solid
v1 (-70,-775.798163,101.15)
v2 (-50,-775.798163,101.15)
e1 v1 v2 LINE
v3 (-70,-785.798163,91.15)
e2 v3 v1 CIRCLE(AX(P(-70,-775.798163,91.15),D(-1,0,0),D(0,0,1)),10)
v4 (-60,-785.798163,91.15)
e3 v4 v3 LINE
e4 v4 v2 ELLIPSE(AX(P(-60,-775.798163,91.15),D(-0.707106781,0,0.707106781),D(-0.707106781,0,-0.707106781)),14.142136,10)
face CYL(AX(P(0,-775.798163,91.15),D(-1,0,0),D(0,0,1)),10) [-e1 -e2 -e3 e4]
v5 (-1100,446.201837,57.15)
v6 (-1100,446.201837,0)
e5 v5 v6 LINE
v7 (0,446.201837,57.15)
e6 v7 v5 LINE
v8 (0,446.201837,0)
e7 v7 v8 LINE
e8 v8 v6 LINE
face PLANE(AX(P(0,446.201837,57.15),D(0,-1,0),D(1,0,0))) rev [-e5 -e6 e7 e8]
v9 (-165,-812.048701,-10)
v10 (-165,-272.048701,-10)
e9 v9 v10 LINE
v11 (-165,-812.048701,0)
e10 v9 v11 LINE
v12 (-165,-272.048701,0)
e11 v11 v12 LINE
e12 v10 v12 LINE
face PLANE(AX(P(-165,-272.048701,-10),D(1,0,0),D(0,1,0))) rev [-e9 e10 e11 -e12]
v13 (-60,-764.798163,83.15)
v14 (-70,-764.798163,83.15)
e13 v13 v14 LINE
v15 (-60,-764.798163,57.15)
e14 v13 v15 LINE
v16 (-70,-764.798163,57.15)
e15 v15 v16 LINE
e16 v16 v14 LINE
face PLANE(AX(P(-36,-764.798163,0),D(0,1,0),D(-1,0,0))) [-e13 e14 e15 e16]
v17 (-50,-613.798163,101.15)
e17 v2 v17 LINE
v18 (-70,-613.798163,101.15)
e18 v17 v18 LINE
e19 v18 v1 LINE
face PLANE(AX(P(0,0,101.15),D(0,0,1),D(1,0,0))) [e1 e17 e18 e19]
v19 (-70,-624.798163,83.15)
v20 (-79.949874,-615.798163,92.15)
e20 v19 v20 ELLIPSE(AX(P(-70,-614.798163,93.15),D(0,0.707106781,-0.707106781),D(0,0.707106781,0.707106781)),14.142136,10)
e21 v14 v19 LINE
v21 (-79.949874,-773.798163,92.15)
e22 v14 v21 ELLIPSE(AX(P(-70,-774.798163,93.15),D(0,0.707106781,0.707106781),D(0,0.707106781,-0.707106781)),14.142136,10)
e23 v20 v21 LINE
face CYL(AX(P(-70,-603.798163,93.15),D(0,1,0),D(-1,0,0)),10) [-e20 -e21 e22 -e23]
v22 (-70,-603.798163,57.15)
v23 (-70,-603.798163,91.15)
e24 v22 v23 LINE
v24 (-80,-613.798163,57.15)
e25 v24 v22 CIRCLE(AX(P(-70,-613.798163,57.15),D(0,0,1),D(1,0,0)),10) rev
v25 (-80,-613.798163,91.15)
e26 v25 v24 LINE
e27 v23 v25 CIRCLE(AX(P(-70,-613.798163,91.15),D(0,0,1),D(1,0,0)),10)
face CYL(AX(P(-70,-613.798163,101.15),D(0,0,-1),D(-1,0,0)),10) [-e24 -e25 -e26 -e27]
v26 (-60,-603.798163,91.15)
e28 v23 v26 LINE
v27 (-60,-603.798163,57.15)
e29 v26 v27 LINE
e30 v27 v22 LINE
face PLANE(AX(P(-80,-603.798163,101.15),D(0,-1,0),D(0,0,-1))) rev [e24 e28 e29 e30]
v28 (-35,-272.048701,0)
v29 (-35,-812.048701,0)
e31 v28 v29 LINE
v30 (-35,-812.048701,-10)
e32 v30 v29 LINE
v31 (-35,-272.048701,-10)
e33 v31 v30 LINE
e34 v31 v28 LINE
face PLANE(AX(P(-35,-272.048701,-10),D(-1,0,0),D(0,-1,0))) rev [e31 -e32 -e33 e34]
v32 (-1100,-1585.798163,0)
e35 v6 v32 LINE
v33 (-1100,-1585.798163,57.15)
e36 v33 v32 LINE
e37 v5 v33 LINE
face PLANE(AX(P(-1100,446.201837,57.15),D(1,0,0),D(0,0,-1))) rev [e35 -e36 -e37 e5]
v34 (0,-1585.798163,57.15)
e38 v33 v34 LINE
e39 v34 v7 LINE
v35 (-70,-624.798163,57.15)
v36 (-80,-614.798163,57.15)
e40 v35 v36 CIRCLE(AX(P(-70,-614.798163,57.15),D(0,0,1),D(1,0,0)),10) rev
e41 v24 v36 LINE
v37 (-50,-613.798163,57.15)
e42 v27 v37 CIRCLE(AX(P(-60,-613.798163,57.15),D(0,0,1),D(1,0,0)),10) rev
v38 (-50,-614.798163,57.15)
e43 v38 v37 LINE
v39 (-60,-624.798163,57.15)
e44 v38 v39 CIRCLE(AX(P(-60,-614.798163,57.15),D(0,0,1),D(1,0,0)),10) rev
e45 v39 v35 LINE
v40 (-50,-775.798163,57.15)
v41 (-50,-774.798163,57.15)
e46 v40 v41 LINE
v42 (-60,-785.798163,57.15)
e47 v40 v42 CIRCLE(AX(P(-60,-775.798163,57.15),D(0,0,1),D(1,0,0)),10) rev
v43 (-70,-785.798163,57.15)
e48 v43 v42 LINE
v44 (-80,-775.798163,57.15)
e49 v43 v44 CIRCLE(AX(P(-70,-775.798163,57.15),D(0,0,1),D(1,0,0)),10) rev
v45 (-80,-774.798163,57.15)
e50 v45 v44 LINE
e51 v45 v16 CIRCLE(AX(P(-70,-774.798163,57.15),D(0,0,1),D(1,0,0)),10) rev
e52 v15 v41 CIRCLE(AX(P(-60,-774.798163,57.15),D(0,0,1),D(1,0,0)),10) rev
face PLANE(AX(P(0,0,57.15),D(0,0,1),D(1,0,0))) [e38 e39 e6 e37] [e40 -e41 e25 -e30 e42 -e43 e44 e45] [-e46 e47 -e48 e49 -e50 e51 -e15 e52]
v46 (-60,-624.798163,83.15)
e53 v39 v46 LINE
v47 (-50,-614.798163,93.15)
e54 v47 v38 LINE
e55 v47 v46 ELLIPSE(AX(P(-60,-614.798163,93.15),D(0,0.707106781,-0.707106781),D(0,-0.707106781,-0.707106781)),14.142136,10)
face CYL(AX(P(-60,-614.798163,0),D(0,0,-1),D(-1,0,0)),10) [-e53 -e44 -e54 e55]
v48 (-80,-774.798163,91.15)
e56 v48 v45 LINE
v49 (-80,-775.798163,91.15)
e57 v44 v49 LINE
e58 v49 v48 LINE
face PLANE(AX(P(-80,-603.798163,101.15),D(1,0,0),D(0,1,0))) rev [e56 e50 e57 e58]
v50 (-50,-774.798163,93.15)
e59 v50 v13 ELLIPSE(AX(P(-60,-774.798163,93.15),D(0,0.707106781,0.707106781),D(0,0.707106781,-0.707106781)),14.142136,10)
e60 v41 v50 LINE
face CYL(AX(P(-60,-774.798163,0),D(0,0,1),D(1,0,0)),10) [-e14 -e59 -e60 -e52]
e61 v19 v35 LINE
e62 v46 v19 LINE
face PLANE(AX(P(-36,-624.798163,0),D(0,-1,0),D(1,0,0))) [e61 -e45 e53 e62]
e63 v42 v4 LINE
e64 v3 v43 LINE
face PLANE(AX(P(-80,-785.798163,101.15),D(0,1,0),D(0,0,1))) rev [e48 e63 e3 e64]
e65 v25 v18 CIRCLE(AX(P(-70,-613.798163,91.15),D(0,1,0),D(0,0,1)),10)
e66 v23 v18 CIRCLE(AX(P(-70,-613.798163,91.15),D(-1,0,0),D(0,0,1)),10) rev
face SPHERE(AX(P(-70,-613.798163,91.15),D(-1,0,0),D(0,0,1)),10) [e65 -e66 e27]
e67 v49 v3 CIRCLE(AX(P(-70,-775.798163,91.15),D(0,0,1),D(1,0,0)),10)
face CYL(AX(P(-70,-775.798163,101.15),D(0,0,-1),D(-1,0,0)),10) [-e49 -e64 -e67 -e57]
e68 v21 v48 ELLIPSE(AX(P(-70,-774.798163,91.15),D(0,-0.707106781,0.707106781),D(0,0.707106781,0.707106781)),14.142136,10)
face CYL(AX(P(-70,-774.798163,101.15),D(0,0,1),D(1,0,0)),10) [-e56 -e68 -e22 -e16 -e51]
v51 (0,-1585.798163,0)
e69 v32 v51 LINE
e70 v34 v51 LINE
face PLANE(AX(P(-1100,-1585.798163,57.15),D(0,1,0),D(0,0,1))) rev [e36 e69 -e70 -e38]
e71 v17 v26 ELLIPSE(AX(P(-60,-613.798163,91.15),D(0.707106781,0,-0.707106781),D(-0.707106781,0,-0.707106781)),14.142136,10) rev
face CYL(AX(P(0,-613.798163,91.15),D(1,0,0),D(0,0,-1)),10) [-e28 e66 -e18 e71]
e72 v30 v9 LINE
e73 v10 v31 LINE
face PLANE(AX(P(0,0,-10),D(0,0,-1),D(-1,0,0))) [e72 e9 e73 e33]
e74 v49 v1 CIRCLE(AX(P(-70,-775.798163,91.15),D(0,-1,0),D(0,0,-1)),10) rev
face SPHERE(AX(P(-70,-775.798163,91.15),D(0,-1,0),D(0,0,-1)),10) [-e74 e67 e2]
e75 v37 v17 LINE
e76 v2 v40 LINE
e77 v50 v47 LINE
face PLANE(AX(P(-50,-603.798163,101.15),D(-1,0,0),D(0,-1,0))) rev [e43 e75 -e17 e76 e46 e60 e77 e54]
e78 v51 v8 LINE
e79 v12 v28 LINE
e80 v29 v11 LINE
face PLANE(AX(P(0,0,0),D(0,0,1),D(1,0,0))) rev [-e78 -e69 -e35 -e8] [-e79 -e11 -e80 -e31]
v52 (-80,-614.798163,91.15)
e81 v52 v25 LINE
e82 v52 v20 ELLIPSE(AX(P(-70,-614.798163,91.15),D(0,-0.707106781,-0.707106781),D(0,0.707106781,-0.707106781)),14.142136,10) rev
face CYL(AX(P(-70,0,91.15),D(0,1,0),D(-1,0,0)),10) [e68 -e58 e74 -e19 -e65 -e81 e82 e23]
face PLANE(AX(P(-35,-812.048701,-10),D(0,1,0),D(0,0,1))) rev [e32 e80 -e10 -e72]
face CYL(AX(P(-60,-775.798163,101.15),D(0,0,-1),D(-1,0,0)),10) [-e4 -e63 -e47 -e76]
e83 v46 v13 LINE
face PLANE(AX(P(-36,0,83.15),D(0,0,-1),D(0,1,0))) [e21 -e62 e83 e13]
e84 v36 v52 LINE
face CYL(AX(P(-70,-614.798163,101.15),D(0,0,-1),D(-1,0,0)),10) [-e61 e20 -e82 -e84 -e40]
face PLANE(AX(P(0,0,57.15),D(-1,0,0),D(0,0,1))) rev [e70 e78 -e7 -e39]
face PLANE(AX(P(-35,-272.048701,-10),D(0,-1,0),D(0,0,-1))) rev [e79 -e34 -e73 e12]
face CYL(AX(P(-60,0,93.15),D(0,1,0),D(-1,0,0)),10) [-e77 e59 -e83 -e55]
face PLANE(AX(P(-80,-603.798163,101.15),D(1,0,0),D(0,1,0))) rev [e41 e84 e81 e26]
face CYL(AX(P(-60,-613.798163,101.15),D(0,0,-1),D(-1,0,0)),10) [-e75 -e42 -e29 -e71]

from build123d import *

# Parameters (mm, degrees)
BOSS_EXTRUDE2_DEPTH = 57.15
BOSS_EXTRUDE3_DEPTH = 44
CUT_EXTRUDE1_DEPTH  = 44
FILLET1_R           = 10
BOSS_EXTRUDE4_DEPTH = 10


with BuildPart() as part:
    # Sketch1 → Boss-Extrude2 (new body)
    with BuildSketch(Plane.XY):
        Polygon((0, 0), (0, 446.2018372120283), (-1100, 446.2018372120282), (-1100, -1585.7981627879717), (0, -1585.7981627879717), align=None)
    extrude(amount=BOSS_EXTRUDE2_DEPTH)

    # Sketch4 → Boss-Extrude3 (add)
    with BuildSketch(Plane.XY.offset(57.15)):
        Polygon((-79.99999999999993, -603.7981627879718), (-49.999999999999936, -603.7981627879718), (-49.999999999999915, -785.7981627879718), (-79.9999999999999, -785.7981627879718), align=None)
    extrude(amount=BOSS_EXTRUDE3_DEPTH)

    # Sketch5 → Cut-Extrude1 (cut)
    with BuildSketch(Plane.ZY.offset(80.00000000000003)):
        Polygon((83.14999999999999, -624.7981627879717), (57.150000000000006, -624.7981627879717), (57.15, -764.7981627879717), (83.15, -764.7981627879717), align=None)
    extrude(amount=-CUT_EXTRUDE1_DEPTH, mode=Mode.SUBTRACT)

    # Fillet1
    # the kernel refuses this fillet: 10 mm, written as the material it takes off along each edge
    with BuildSketch(Plane(origin=(-69.99999999999993, -613.7981627879718, 91.15), x_dir=(-1, -1.6e-16, 0), z_dir=(0, 1, 0))) as fillet1_piece_1_section:
        Polygon((0, 0), (FILLET1_R, 0), (FILLET1_R, FILLET1_R), (0, FILLET1_R), align=None)
    fillet1_piece_1 = extrude(amount=FILLET1_R, mode=Mode.PRIVATE)
    fillet1_piece_1 = fillet1_piece_1 - Plane(origin=(-69.99999999999993, -613.7981627879718, 91.15), x_dir=(0.7071067811865475, 0, -0.7071067811865475), z_dir=(0, 1, 0)) * Sphere(FILLET1_R, mode=Mode.PRIVATE)
    add(fillet1_piece_1, mode=Mode.SUBTRACT)
    with BuildSketch(Plane(origin=(-69.9999999999999, -775.7981627879718, 91.15), x_dir=(0, 0, 1), z_dir=(-1, -1.6e-16, 0))) as fillet1_piece_2_section:
        Polygon((0, 0), (FILLET1_R, 0), (FILLET1_R, -FILLET1_R), (0, -FILLET1_R), align=None)
    fillet1_piece_2 = extrude(amount=FILLET1_R, mode=Mode.PRIVATE)
    fillet1_piece_2 = fillet1_piece_2 - Plane(origin=(-69.9999999999999, -775.7981627879718, 91.15), x_dir=(0, 0.7071067811865475, -0.7071067811865475), z_dir=(-1, -1.6e-16, 0)) * Sphere(FILLET1_R, mode=Mode.PRIVATE)
    add(fillet1_piece_2, mode=Mode.SUBTRACT)
    with BuildSketch(Plane(origin=(-49.999999999999915, -785.7981627879718, 57.15), x_dir=(-1, 0, 0), z_dir=(0, 0, 1))) as fillet1_piece_3:
        with BuildLine():
            CenterArc((FILLET1_R, -FILLET1_R), FILLET1_R, 90, 90)
            Line((0, -FILLET1_R), (0, 0))
            Line((0, 0), (FILLET1_R, 0))
        make_face()
    extrude(amount=69, mode=Mode.SUBTRACT)
    with BuildSketch(Plane(origin=(-49.999999999999936, -603.7981627879718, 57.15), x_dir=(0, -1, 0), z_dir=(0, 0, 1))) as fillet1_piece_4:
        with BuildLine():
            CenterArc((FILLET1_R, -FILLET1_R), FILLET1_R, 90, 90)
            Line((0, -FILLET1_R), (0, 0))
            Line((0, 0), (FILLET1_R, 0))
        make_face()
    extrude(amount=69, mode=Mode.SUBTRACT)
    with BuildSketch(Plane(origin=(-79.99999999999993, -603.7981627879718, 57.15), x_dir=(1, 0, 0), z_dir=(0, 0, 1))) as fillet1_piece_5:
        with BuildLine():
            CenterArc((FILLET1_R, -FILLET1_R), FILLET1_R, 90, 90)
            Line((0, -FILLET1_R), (0, 0))
            Line((0, 0), (FILLET1_R, 0))
        make_face()
    extrude(amount=34.00000000000001, mode=Mode.SUBTRACT)
    with BuildSketch(Plane(origin=(-79.9999999999999, -785.7981627879718, 57.15), x_dir=(1, 0, 0), z_dir=(0, 0, 1))) as fillet1_piece_6:
        with BuildLine():
            CenterArc((FILLET1_R, FILLET1_R), FILLET1_R, 180, 90)
            Line((0, FILLET1_R), (0, 0))
            Line((0, 0), (FILLET1_R, 0))
        make_face()
    extrude(amount=34.00000000000001, mode=Mode.SUBTRACT)
    with BuildSketch(Plane(origin=(-69.99999999999993, -603.7981627879718, 101.15), x_dir=(0, 0, -1), z_dir=(1, 0, 0))) as fillet1_piece_7:
        with BuildLine():
            CenterArc((FILLET1_R, -FILLET1_R), FILLET1_R, 90, 90)
            Line((0, -FILLET1_R), (0, 0))
            Line((0, 0), (FILLET1_R, 0))
        make_face()
    extrude(amount=44.99999999999999, mode=Mode.SUBTRACT)
    with BuildSketch(Plane(origin=(-79.9999999999999, -775.7981627879718, 101.15), x_dir=(0, 0, -1), z_dir=(-1.6e-16, 1, 0))) as fillet1_piece_8:
        with BuildLine():
            CenterArc((FILLET1_R, -FILLET1_R), FILLET1_R, 90, 90)
            Line((0, -FILLET1_R), (0, 0))
            Line((0, 0), (FILLET1_R, 0))
        make_face()
    extrude(amount=162, mode=Mode.SUBTRACT)
    with BuildSketch(Plane(origin=(-24.999999999999915, -785.7981627879718, 101.15), x_dir=(0, 0, -1), z_dir=(-1, 0, 0))) as fillet1_piece_9:
        with BuildLine():
            CenterArc((FILLET1_R, -FILLET1_R), FILLET1_R, 90, 90)
            Line((0, -FILLET1_R), (0, 0))
            Line((0, 0), (FILLET1_R, 0))
        make_face()
    extrude(amount=44.999999999999986, mode=Mode.SUBTRACT)
    with BuildSketch(Plane(origin=(-79.99999999999991, -764.7981627879717, 57.15000000000002), x_dir=(1.42e-15, -1, 0), z_dir=(0, 0, 1))) as fillet1_piece_10:
        with BuildLine():
            CenterArc((FILLET1_R, FILLET1_R), FILLET1_R, 180, 89.99999999999989)
            Line((1.421e-14, FILLET1_R), (0, 0))
            Line((0, 0), (FILLET1_R, 0))
        make_face()
    extrude(amount=25.999999999999986, mode=Mode.SUBTRACT)
    with BuildSketch(Plane(origin=(-79.99999999999993, -624.7981627879717, 83.14999999999999), x_dir=(0, 1, 0), z_dir=(0, 0, -1))) as fillet1_piece_11:
        with BuildLine():
            CenterArc((FILLET1_R, FILLET1_R), FILLET1_R, 180, 90)
            Line((0, FILLET1_R), (0, 0))
            Line((0, 0), (FILLET1_R, 0))
        make_face()
    extrude(amount=25.999999999999986, mode=Mode.SUBTRACT)
    with BuildSketch(Plane(origin=(-79.99999999999991, -764.7981627879717, 83.15), x_dir=(1.42e-15, 1e-16, 1), z_dir=(-1.5e-16, 1, -1e-16))) as fillet1_piece_12:
        with BuildLine():
            CenterArc((FILLET1_R, FILLET1_R), FILLET1_R, 180, 89.99999999999989)
            Line((1.421e-14, FILLET1_R), (0, 0))
            Line((0, 0), (FILLET1_R, 0))
        make_face()
    extrude(amount=140, mode=Mode.SUBTRACT)
    with BuildSketch(Plane(origin=(-49.999999999999915, -764.7981627879717, 83.15), x_dir=(0, -1, 0), z_dir=(0, 0, -1))) as fillet1_piece_13:
        with BuildLine():
            CenterArc((FILLET1_R, FILLET1_R), FILLET1_R, 180, 90)
            Line((0, FILLET1_R), (0, 0))
            Line((0, 0), (FILLET1_R, 0))
        make_face()
    extrude(amount=26, mode=Mode.SUBTRACT)
    with BuildSketch(Plane(origin=(-49.999999999999936, -624.7981627879717, 57.150000000000006), x_dir=(0, 1, 0), z_dir=(0, 0, 1))) as fillet1_piece_14:
        with BuildLine():
            CenterArc((FILLET1_R, FILLET1_R), FILLET1_R, 180.00000000000003, 90)
            Line((0, FILLET1_R), (0, 0))
            Line((0, 0), (FILLET1_R, 0))
        make_face()
    extrude(amount=25.999999999999986, mode=Mode.SUBTRACT)
    with BuildSketch(Plane(origin=(-49.999999999999936, -624.7981627879717, 83.15), x_dir=(0, 1e-16, 1), z_dir=(1.2e-16, -1, 1e-16))) as fillet1_piece_15:
        with BuildLine():
            CenterArc((FILLET1_R, FILLET1_R), FILLET1_R, 180, 90)
            Line((0, FILLET1_R), (0, 0))
            Line((0, 0), (FILLET1_R, 0))
        make_face()
    extrude(amount=140, mode=Mode.SUBTRACT)
    with BuildSketch(Plane(origin=(-79.99999999999991, -764.7981627879717, 57.15000000000002), x_dir=(1.42e-15, -1, 0), z_dir=(0, 0, 1))) as fillet1_piece_16a_section:
        with BuildLine():
            CenterArc((FILLET1_R, FILLET1_R), FILLET1_R, 180, 89.99999999999989)
            Line((1.421e-14, FILLET1_R), (0, 0))
            Line((0, 0), (FILLET1_R, 0))
        make_face()
    fillet1_piece_16a = extrude(amount=50.999999999999986, mode=Mode.PRIVATE)
    fillet1_piece_16a = split(fillet1_piece_16a, bisect_by=Plane(origin=(-77.7360488573316, -767.0621139306398, 83.15), z_dir=(0, 1e-16, 1)), keep=Keep.TOP, mode=Mode.PRIVATE)
    with BuildSketch(Plane(origin=(-79.9999999999999, -789.7981627879717, 83.15), x_dir=(0, 1e-16, 1), z_dir=(-1.5e-16, 1, -1e-16))) as fillet1_piece_16b_section:
        with BuildLine():
            CenterArc((FILLET1_R, FILLET1_R), FILLET1_R, 180, 90)
            Line((0, FILLET1_R), (0, 0))
            Line((0, 0), (FILLET1_R, 0))
        make_face()
    fillet1_piece_16b = extrude(amount=165, mode=Mode.PRIVATE)
    fillet1_piece_16b = split(fillet1_piece_16b, bisect_by=Plane(origin=(-77.73604885733165, -764.7981627879717, 85.41395114266827), z_dir=(1.5e-16, -1, 0)), keep=Keep.TOP, mode=Mode.PRIVATE)
    fillet1_piece_16 = fillet1_piece_16a & fillet1_piece_16b
    add(fillet1_piece_16, mode=Mode.SUBTRACT)
    with BuildSketch(Plane(origin=(-79.99999999999991, -764.7981627879717, 83.15), x_dir=(1.42e-15, 1e-16, 1), z_dir=(-1.5e-16, 1, -1e-16))) as fillet1_piece_17a_section:
        with BuildLine():
            CenterArc((FILLET1_R, FILLET1_R), FILLET1_R, 180, 89.99999999999989)
            Line((1.421e-14, FILLET1_R), (0, 0))
            Line((0, 0), (FILLET1_R, 0))
        make_face()
    fillet1_piece_17a = extrude(amount=165, mode=Mode.PRIVATE)
    fillet1_piece_17a = split(fillet1_piece_17a, bisect_by=Plane(origin=(-77.73604885733167, -624.7981627879717, 85.41395114266825), z_dir=(-1.5e-16, 1, 0)), keep=Keep.TOP, mode=Mode.PRIVATE)
    with BuildSketch(Plane(origin=(-79.99999999999993, -624.7981627879717, 108.14999999999998), x_dir=(0, 1, 0), z_dir=(0, 0, -1))) as fillet1_piece_17b_section:
        with BuildLine():
            CenterArc((FILLET1_R, FILLET1_R), FILLET1_R, 180, 90)
            Line((0, FILLET1_R), (0, 0))
            Line((0, 0), (FILLET1_R, 0))
        make_face()
    fillet1_piece_17b = extrude(amount=50.999999999999986, mode=Mode.PRIVATE)
    fillet1_piece_17b = split(fillet1_piece_17b, bisect_by=Plane(origin=(-77.73604885733164, -622.5342116453035, 83.14999999999999), z_dir=(0, 1e-16, 1)), keep=Keep.TOP, mode=Mode.PRIVATE)
    fillet1_piece_17 = fillet1_piece_17a & fillet1_piece_17b
    add(fillet1_piece_17, mode=Mode.SUBTRACT)
    with BuildSketch(Plane(origin=(-49.999999999999936, -624.7981627879717, 83.15), x_dir=(0, 1e-16, 1), z_dir=(1.2e-16, -1, 1e-16))) as fillet1_piece_18a_section:
        with BuildLine():
            CenterArc((FILLET1_R, FILLET1_R), FILLET1_R, 180, 90)
            Line((0, FILLET1_R), (0, 0))
            Line((0, 0), (FILLET1_R, 0))
        make_face()
    fillet1_piece_18a = extrude(amount=165, mode=Mode.PRIVATE)
    fillet1_piece_18a = split(fillet1_piece_18a, bisect_by=Plane(origin=(-52.26395114266817, -764.7981627879717, 85.41395114266827), z_dir=(1.5e-16, -1, 0)), keep=Keep.TOP, mode=Mode.PRIVATE)
    with BuildSketch(Plane(origin=(-49.999999999999915, -764.7981627879717, 108.15), x_dir=(0, -1, 0), z_dir=(0, 0, -1))) as fillet1_piece_18b_section:
        with BuildLine():
            CenterArc((FILLET1_R, FILLET1_R), FILLET1_R, 180, 90)
            Line((0, FILLET1_R), (0, 0))
            Line((0, 0), (FILLET1_R, 0))
        make_face()
    fillet1_piece_18b = extrude(amount=51, mode=Mode.PRIVATE)
    fillet1_piece_18b = split(fillet1_piece_18b, bisect_by=Plane(origin=(-52.2639511426682, -767.0621139306397, 83.15), z_dir=(0, 1e-16, 1)), keep=Keep.TOP, mode=Mode.PRIVATE)
    fillet1_piece_18 = fillet1_piece_18a & fillet1_piece_18b
    add(fillet1_piece_18, mode=Mode.SUBTRACT)
    with BuildSketch(Plane(origin=(-49.999999999999936, -624.7981627879717, 57.150000000000006), x_dir=(0, 1, 0), z_dir=(0, 0, 1))) as fillet1_piece_19a_section:
        with BuildLine():
            CenterArc((FILLET1_R, FILLET1_R), FILLET1_R, 180.00000000000003, 90)
            Line((0, FILLET1_R), (0, 0))
            Line((0, 0), (FILLET1_R, 0))
        make_face()
    fillet1_piece_19a = extrude(amount=50.999999999999986, mode=Mode.PRIVATE)
    fillet1_piece_19a = split(fillet1_piece_19a, bisect_by=Plane(origin=(-52.26395114266823, -622.5342116453035, 83.14999999999999), z_dir=(0, 1e-16, 1)), keep=Keep.TOP, mode=Mode.PRIVATE)
    with BuildSketch(Plane(origin=(-49.999999999999936, -599.7981627879717, 83.14999999999999), x_dir=(0, 1e-16, 1), z_dir=(1.2e-16, -1, 1e-16))) as fillet1_piece_19b_section:
        with BuildLine():
            CenterArc((FILLET1_R, FILLET1_R), FILLET1_R, 179.99999999999997, 90)
            Line((0, FILLET1_R), (0, 0))
            Line((0, 0), (FILLET1_R, 0))
        make_face()
    fillet1_piece_19b = extrude(amount=165, mode=Mode.PRIVATE)
    fillet1_piece_19b = split(fillet1_piece_19b, bisect_by=Plane(origin=(-52.26395114266818, -624.7981627879717, 85.41395114266824), z_dir=(-1.5e-16, 1, 0)), keep=Keep.TOP, mode=Mode.PRIVATE)
    fillet1_piece_19 = fillet1_piece_19a & fillet1_piece_19b
    add(fillet1_piece_19, mode=Mode.SUBTRACT)

    # Sketch6 → Boss-Extrude4 (add)
    with BuildSketch(Plane(origin=(0, 0, 0), x_dir=(-1, 0, 0), z_dir=(0, 0, -1))):
        Polygon((34.99999999999994, -272.04870051020725), (164.99999999999986, -272.04870051020725), (165, -812.0487005102073), (35, -812.0487005102073), align=None)
    extrude(amount=BOSS_EXTRUDE4_DEPTH)


solid = part.part
